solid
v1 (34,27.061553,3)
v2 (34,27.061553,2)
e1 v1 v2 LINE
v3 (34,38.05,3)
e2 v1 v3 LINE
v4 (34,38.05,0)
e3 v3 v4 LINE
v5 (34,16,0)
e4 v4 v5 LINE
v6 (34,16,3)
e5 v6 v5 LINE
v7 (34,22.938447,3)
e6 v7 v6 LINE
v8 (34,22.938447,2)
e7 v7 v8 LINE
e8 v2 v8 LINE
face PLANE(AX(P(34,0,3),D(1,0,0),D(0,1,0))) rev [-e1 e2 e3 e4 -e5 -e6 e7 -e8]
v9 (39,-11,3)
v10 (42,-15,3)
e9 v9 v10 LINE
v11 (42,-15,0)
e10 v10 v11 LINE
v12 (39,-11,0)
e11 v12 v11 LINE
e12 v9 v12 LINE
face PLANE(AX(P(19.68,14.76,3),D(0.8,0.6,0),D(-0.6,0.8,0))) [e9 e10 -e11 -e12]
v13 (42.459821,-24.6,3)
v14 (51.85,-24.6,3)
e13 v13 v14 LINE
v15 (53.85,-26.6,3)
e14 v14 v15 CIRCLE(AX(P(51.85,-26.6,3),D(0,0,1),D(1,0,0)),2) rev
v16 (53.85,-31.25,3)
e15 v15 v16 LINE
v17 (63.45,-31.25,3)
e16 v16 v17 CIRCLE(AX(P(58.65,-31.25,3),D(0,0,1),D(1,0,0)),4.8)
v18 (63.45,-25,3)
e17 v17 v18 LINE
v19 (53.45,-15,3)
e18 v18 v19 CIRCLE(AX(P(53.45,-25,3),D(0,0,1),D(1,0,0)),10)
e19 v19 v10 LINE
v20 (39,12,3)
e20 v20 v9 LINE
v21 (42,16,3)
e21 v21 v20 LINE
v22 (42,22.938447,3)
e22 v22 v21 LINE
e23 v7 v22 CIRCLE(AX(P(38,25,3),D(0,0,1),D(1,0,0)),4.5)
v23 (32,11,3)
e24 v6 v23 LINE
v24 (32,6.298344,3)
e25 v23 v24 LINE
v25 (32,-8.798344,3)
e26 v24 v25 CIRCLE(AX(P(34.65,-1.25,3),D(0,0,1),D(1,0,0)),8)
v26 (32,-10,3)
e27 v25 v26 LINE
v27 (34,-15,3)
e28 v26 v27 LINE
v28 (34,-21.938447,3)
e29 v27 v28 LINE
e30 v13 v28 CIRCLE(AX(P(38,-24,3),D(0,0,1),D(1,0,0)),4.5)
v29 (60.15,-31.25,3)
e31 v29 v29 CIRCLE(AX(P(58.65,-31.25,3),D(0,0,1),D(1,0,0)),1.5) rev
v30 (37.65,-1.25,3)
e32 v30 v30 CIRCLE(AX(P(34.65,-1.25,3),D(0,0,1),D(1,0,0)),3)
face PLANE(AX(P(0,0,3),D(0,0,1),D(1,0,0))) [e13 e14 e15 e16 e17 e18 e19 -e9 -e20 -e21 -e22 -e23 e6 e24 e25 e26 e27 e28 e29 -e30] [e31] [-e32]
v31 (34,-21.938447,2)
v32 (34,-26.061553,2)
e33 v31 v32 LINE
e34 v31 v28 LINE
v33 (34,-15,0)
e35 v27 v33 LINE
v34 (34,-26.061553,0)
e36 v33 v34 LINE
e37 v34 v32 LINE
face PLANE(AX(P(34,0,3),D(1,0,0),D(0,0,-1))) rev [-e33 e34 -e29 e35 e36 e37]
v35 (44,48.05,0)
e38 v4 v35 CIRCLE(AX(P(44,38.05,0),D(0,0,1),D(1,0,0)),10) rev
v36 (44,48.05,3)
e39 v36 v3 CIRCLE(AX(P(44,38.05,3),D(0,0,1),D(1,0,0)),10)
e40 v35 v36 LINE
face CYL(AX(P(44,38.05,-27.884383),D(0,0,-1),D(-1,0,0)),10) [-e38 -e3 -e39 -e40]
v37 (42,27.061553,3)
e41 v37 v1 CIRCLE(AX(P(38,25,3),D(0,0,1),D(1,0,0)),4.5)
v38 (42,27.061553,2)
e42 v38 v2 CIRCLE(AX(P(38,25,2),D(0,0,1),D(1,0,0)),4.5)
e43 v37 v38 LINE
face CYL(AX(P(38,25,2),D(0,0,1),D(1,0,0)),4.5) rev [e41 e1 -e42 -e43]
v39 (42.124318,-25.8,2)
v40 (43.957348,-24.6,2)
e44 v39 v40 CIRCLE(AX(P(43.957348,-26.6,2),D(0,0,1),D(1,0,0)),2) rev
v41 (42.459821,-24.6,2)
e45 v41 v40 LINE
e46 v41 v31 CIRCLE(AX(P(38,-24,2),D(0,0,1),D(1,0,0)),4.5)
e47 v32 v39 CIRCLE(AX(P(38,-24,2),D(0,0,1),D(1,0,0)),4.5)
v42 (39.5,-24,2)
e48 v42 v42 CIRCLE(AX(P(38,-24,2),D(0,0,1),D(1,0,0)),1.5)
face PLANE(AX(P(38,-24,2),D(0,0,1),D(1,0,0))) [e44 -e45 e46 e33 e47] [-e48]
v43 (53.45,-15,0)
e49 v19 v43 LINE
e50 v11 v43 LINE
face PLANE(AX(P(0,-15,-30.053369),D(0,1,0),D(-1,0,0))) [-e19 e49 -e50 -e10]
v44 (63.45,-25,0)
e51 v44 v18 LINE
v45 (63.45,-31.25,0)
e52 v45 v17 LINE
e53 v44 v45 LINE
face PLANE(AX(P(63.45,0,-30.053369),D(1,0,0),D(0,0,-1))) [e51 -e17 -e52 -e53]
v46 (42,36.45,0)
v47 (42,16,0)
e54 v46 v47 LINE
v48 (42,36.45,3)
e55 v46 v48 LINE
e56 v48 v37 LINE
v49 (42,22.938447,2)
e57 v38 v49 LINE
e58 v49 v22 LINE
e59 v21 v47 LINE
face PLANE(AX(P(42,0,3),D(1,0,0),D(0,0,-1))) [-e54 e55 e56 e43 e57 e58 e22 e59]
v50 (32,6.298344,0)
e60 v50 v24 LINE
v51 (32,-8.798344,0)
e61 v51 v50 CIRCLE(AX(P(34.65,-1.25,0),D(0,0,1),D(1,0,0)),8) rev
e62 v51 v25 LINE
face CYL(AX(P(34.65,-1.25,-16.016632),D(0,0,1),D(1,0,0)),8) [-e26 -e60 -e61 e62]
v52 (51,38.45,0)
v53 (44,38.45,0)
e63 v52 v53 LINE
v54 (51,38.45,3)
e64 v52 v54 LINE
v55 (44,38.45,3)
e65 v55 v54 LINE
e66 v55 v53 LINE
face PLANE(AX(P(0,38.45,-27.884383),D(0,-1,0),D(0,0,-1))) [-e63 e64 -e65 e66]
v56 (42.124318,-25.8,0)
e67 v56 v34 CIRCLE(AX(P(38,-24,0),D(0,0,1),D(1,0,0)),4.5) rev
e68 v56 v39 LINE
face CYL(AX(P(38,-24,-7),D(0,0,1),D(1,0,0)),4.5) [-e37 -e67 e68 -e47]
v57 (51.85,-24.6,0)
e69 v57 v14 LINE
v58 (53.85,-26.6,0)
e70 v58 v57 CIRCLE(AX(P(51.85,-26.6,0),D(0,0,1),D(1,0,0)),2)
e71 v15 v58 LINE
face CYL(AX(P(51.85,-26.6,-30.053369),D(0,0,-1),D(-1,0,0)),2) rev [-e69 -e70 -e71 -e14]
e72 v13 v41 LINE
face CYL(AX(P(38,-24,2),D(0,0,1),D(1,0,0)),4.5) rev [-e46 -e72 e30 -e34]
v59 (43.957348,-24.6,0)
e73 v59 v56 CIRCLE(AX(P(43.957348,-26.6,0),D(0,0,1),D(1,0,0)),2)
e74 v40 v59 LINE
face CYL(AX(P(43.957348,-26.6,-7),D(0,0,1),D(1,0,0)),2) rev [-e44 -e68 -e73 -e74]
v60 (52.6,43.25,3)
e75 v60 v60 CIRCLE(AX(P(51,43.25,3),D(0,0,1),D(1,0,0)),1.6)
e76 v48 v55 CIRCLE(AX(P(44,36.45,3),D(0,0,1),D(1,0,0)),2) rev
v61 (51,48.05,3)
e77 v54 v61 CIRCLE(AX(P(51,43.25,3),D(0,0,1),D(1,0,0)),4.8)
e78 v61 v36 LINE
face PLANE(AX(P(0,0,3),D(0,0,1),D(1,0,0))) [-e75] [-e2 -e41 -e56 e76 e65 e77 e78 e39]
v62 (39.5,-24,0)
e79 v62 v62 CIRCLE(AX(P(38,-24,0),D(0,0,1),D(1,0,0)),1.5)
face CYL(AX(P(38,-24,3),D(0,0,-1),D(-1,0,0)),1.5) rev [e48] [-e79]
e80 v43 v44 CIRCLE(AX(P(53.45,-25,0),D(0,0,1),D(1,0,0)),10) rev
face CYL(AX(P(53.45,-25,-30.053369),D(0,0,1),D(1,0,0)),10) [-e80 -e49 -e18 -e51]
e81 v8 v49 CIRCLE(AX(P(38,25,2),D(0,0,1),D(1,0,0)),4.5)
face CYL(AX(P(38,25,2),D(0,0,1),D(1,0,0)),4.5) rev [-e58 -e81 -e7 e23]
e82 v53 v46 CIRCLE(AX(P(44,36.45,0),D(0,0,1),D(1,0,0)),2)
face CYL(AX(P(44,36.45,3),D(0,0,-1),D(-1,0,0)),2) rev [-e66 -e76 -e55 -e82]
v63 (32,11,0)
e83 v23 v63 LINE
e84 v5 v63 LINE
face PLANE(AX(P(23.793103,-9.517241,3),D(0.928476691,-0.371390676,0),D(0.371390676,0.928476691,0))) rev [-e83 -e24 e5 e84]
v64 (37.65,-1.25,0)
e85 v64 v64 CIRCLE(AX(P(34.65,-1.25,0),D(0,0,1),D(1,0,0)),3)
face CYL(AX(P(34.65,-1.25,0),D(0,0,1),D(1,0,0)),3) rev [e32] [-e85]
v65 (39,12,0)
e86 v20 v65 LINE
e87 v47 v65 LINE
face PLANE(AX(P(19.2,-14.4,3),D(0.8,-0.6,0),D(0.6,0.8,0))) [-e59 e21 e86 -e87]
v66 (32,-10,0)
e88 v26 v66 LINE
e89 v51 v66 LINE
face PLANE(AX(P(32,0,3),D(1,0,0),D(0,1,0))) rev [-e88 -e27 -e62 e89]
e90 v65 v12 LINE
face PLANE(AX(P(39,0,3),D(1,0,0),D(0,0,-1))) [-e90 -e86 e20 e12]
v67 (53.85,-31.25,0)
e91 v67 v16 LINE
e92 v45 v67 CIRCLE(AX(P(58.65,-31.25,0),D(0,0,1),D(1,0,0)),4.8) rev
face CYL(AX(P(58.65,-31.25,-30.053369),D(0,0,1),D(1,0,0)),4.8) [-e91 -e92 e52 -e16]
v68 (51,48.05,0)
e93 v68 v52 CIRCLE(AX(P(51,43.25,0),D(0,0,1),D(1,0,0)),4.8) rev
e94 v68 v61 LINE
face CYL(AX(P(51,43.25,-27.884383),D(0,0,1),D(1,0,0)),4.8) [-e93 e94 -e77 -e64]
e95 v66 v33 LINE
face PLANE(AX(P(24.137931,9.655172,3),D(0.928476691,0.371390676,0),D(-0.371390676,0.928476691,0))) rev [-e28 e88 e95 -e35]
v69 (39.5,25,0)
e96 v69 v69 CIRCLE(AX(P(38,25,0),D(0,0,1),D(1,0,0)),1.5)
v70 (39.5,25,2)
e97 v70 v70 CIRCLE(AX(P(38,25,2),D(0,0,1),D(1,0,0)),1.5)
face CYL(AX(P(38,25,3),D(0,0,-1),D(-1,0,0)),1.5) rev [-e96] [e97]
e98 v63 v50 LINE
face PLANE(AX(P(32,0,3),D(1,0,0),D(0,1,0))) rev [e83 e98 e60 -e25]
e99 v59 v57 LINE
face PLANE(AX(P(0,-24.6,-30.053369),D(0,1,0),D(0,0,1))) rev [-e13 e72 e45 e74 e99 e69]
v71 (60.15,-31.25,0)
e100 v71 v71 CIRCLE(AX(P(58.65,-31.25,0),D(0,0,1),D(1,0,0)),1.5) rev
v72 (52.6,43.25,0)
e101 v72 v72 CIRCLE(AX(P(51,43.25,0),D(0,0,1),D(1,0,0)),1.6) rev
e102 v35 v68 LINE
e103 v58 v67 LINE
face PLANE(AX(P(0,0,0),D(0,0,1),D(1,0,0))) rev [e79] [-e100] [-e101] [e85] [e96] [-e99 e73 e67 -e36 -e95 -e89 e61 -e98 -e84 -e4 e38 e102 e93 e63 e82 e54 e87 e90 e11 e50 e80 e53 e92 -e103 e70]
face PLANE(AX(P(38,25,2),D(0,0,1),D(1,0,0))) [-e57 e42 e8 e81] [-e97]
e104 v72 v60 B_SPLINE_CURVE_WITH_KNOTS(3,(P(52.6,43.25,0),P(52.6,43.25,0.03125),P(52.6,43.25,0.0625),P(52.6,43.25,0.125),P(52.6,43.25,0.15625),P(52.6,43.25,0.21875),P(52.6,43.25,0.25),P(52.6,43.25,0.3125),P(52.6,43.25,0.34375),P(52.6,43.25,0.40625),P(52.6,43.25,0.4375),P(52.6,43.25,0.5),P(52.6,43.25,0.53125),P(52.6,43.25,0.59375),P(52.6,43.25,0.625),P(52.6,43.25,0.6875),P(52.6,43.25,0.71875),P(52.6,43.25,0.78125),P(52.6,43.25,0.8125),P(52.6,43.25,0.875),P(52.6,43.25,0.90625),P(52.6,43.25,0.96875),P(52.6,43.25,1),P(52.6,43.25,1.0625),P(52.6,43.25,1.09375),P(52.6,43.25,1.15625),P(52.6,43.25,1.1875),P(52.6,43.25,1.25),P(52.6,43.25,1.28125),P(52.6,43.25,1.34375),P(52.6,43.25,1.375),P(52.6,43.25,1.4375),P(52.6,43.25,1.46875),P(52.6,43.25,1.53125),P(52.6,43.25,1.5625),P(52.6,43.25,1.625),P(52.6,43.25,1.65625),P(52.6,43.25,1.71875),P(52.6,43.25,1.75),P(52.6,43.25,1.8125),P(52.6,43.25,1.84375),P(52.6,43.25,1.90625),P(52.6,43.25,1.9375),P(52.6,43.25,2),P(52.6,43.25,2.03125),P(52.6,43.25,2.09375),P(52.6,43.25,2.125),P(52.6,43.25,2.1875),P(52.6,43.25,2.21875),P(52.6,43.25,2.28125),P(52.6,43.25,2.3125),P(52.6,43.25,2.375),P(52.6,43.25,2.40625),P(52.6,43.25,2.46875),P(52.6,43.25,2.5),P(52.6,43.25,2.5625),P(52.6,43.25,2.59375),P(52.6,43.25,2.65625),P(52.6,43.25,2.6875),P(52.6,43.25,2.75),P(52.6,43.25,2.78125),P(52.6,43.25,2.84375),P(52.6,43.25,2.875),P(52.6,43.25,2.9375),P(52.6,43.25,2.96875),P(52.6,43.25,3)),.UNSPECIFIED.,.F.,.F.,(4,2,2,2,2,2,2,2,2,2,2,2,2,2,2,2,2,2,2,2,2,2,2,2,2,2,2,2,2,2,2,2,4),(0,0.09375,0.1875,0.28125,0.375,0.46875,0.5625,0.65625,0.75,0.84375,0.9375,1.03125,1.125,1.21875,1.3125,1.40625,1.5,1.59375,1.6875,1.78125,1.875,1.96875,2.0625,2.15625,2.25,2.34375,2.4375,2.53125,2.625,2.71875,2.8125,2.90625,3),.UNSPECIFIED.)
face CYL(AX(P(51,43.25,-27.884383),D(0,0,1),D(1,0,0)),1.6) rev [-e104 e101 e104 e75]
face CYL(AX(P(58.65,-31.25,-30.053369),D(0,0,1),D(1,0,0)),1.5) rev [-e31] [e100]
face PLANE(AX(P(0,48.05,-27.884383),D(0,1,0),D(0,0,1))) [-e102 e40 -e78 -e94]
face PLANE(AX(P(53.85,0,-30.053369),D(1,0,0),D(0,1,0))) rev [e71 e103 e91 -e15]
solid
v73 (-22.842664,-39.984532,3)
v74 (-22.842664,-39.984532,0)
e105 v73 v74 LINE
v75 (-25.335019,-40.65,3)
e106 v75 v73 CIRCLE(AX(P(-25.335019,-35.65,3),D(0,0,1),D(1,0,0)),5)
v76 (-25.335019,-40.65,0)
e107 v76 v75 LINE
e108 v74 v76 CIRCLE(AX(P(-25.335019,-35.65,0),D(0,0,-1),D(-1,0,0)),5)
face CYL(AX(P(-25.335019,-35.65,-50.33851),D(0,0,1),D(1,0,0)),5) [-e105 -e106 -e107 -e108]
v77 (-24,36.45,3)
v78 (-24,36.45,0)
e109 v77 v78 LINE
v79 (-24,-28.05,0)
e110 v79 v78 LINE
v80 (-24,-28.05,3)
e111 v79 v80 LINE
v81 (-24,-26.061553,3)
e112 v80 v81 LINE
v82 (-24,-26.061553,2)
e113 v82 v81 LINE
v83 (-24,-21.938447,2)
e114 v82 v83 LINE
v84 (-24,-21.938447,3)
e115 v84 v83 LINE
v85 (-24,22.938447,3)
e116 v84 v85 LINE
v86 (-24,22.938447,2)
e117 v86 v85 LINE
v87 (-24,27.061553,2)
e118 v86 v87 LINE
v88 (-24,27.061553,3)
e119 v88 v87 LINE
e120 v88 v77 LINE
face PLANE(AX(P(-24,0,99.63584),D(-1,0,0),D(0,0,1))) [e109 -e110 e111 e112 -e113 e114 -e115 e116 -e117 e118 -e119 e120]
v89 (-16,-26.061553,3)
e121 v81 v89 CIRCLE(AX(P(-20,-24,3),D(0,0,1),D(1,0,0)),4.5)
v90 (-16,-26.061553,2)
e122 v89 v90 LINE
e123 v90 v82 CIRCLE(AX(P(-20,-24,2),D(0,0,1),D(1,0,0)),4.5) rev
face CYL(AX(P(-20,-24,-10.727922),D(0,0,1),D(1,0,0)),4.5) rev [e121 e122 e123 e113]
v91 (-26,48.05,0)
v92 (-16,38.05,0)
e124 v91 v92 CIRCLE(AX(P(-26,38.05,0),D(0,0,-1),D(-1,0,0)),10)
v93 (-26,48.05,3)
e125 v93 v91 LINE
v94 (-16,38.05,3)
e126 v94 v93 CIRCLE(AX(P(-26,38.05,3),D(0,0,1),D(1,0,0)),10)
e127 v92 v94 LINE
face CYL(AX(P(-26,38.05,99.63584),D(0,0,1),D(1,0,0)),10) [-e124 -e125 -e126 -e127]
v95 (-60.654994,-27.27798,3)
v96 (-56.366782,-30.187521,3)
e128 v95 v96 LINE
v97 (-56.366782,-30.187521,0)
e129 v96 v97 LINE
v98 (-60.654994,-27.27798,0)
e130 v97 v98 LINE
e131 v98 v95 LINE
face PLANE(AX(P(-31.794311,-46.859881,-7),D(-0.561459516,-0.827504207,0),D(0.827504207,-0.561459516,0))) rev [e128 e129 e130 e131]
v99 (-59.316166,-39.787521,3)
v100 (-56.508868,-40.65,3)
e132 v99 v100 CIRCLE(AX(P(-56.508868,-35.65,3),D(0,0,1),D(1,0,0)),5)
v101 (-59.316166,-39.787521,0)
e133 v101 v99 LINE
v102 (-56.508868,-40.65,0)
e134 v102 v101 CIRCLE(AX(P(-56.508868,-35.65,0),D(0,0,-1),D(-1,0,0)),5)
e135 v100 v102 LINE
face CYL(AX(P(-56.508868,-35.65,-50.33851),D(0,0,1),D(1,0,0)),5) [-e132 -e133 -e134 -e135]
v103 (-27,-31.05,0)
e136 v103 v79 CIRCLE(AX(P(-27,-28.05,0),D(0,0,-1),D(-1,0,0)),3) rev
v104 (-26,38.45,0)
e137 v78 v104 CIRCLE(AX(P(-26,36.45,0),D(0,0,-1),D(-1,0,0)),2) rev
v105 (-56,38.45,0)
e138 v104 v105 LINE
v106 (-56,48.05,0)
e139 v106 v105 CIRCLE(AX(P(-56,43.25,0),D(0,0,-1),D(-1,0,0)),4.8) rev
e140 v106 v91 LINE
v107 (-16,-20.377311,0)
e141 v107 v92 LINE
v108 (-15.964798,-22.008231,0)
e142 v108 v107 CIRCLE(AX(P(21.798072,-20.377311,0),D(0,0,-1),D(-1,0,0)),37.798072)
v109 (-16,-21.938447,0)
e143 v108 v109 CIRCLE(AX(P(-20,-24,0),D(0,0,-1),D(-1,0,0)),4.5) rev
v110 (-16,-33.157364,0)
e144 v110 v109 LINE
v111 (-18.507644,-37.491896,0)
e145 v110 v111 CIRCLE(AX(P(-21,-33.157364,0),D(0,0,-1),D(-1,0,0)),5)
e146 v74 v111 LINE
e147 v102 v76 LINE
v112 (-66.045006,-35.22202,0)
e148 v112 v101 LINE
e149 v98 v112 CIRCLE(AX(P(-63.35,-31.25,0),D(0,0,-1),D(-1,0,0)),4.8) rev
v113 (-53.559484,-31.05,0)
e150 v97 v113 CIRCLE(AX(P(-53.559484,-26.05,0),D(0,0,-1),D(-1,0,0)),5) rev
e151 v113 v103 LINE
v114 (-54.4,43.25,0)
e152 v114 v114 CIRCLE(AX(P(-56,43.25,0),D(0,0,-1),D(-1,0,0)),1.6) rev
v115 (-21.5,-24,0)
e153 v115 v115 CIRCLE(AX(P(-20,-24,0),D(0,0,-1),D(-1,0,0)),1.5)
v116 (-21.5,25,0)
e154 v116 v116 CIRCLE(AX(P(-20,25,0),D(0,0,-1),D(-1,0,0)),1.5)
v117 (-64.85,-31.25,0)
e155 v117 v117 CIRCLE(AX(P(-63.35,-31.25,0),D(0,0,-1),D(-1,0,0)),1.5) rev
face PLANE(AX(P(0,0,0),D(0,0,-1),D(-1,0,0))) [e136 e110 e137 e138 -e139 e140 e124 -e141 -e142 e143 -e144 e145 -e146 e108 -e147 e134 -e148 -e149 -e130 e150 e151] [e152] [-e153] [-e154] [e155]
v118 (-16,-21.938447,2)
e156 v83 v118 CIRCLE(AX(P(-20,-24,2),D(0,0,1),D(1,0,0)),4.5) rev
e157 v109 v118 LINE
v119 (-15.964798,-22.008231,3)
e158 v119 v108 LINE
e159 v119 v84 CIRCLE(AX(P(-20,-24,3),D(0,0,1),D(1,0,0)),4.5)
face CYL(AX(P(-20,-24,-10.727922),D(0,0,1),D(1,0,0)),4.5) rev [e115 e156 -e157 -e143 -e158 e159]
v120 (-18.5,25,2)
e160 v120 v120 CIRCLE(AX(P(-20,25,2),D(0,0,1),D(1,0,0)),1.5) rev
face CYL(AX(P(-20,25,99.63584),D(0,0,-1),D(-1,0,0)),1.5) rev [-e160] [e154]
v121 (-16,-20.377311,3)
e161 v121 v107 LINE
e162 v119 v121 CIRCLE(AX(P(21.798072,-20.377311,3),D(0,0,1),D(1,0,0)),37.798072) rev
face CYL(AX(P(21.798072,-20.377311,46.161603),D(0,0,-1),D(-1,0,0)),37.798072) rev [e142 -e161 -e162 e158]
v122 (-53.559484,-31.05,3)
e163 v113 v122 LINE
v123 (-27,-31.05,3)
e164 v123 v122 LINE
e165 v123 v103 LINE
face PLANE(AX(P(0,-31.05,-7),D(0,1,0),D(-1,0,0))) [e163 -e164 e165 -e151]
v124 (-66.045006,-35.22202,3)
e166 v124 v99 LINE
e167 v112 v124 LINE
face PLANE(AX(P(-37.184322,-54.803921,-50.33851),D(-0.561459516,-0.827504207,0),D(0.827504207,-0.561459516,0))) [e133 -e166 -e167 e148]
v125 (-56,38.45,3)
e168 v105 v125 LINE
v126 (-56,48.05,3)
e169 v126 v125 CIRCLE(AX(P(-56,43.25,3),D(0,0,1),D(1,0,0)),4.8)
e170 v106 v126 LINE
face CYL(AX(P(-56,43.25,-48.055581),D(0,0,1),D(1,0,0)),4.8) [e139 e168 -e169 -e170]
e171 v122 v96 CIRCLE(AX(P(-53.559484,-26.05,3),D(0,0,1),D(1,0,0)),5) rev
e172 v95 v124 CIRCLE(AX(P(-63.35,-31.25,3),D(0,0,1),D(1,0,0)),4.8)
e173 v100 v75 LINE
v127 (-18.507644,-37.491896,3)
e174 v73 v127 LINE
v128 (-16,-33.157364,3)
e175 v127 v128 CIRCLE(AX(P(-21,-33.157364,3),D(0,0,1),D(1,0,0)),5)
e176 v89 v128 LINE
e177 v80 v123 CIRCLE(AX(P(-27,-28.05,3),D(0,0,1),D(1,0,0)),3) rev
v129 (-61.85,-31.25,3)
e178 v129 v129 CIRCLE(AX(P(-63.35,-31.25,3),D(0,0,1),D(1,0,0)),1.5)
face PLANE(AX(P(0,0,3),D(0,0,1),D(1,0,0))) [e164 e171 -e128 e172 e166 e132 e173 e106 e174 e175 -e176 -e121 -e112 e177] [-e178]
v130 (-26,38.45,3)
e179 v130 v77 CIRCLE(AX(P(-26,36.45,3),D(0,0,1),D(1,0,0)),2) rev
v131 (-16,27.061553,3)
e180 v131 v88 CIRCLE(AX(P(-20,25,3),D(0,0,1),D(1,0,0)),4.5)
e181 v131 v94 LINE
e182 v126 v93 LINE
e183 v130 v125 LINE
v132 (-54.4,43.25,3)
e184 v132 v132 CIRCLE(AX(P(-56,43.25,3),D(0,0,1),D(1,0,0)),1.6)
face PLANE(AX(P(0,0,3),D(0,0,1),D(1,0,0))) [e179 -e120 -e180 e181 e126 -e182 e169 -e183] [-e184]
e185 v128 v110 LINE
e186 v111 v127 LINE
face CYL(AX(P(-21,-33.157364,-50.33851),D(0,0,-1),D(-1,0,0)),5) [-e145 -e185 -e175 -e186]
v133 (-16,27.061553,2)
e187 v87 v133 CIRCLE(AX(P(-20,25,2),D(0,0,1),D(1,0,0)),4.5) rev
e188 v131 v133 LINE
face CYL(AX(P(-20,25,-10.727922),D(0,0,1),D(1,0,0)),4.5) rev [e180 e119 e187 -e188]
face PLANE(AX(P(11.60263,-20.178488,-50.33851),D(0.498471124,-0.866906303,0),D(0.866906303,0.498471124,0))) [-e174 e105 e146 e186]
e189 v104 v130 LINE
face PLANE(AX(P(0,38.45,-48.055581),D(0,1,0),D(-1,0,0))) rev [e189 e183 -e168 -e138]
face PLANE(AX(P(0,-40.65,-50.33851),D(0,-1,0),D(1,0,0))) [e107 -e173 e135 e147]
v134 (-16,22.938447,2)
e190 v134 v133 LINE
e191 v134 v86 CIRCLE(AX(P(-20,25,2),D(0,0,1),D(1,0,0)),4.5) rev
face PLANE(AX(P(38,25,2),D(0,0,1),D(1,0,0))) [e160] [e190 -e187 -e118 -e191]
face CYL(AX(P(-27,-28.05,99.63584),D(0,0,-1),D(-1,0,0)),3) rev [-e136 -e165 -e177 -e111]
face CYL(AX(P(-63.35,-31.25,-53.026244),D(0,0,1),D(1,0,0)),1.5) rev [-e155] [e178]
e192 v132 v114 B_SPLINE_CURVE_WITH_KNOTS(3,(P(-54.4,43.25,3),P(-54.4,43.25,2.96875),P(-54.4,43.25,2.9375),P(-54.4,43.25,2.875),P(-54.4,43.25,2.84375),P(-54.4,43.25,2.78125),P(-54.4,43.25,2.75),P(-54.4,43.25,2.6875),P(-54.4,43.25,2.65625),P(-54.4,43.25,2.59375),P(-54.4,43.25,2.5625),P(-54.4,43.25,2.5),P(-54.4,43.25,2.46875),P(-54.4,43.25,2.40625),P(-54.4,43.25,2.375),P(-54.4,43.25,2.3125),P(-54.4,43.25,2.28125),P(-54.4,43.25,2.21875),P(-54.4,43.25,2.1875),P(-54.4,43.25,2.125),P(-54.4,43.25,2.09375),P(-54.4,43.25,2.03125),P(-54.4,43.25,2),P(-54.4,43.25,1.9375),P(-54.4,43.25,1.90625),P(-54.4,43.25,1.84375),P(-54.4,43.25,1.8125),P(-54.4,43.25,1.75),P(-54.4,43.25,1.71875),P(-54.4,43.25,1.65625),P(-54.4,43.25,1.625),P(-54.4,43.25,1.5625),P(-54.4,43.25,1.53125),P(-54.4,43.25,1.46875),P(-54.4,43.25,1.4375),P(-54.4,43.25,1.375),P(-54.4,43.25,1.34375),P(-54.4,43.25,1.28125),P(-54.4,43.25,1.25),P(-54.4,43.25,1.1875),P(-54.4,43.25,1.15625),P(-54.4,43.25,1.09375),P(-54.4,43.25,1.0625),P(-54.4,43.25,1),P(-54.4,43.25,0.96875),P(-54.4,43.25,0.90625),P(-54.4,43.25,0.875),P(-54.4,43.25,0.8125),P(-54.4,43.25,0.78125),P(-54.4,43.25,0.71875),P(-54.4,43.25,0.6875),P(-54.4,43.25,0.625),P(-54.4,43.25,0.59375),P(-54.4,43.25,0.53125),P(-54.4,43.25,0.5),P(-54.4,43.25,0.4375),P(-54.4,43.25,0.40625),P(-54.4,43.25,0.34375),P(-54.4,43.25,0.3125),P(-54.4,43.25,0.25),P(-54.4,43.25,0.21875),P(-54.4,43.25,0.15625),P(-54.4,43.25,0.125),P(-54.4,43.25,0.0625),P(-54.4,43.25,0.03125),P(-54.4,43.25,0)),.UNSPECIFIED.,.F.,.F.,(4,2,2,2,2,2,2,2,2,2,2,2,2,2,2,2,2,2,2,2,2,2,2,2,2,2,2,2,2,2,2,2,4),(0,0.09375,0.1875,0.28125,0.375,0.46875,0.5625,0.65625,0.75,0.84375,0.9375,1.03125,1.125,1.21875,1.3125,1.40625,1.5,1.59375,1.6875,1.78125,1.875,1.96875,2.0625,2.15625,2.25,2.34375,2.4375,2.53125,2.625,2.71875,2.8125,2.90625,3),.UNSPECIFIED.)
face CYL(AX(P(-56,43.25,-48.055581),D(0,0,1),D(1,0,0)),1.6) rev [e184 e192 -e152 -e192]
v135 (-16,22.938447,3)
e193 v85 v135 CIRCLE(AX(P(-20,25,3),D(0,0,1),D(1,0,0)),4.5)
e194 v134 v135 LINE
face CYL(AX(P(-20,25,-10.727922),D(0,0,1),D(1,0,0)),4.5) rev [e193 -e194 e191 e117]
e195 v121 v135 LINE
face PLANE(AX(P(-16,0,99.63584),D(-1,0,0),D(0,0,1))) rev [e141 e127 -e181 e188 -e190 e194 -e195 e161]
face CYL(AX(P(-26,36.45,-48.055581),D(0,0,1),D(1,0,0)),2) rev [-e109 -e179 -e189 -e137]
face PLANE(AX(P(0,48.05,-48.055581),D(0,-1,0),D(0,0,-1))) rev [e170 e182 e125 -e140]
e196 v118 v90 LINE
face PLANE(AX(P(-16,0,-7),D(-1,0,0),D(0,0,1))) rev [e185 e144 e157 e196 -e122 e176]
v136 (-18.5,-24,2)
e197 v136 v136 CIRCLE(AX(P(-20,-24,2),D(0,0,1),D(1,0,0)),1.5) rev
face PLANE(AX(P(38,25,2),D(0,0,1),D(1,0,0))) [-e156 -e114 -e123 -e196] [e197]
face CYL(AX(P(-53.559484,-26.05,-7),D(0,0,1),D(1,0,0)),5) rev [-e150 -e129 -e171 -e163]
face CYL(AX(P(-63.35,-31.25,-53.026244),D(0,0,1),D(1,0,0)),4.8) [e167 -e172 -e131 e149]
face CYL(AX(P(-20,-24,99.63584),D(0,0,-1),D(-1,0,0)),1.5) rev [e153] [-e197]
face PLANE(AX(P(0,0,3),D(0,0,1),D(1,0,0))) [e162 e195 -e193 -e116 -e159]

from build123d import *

# Parameters (mm, degrees)
SKETCH1_R            = 4
SKETCH1_R_2          = 1.5
BOSS_EXTRUDE1_DEPTH  = 3
SKETCH3_R            = 4
SKETCH3_R_2          = 1.5
BOSS_EXTRUDE2_DEPTH  = 3
BOSS_EXTRUDE3_START  = -3
SKETCH4_R            = 4.5
SKETCH4_R_2          = 1.5
BOSS_EXTRUDE3_DEPTH  = 3
BOSS_EXTRUDE4_START  = -3
SKETCH6_R            = 4.5
SKETCH6_R_2          = 1.5
BOSS_EXTRUDE4_DEPTH  = 3
SKETCH7_R            = 4.5
CUT_EXTRUDE1_DEPTH   = 1
BOSS_EXTRUDE5_START  = -2
SKETCH8_R            = 4.5
BOSS_EXTRUDE5_DEPTH  = 2
CUT_EXTRUDE2_DEPTH   = 1
SKETCH11_R           = 4.5
SKETCH11_R_2         = 1.5
BOSS_EXTRUDE6_DEPTH  = 3
CUT_EXTRUDE3_DEPTH   = 10
FILLET1_R            = 15
SKETCH13_R           = 4.5
CUT_EXTRUDE4_DEPTH   = 1
SKETCH14_R           = 2.8
CUT_EXTRUDE5_DEPTH   = 1
CUT_EXTRUDE6_DEPTH   = 10
SKETCH17_R           = 4.8
SKETCH17_R_2         = 2.8
SKETCH17_R_3         = 1.5
BOSS_EXTRUDE7_DEPTH  = 2
CUT_EXTRUDE7_DEPTH   = 10
BOSS_EXTRUDE9_DEPTH  = 2
BOSS_EXTRUDE10_START = 1
SKETCH20_R           = 1.5
BOSS_EXTRUDE10_DEPTH = 1
FILLET2_R            = 2
FILLET3_R            = 10
BOSS_EXTRUDE11_DEPTH = 3
CUT_EXTRUDE8_DEPTH   = 74.037695747
BOSS_EXTRUDE13_DEPTH = 3
CUT_EXTRUDE9_START   = 27
SKETCH23_R           = 4.5
CUT_EXTRUDE9_DEPTH   = 27
SKETCH24_R           = 1.6
BOSS_EXTRUDE14_DEPTH = 3
CUT_EXTRUDE10_DEPTH  = 80.647379116
FILLET4_R            = 2
FILLET5_R            = 10
SKETCH26_R           = 1.6
BOSS_EXTRUDE15_DEPTH = 3
FILLET6_R            = 2
FILLET7_R            = 10
BOSS_EXTRUDE16_DEPTH = 3
SKETCH28_R           = 4.8
SKETCH28_R_2         = 1.5
BOSS_EXTRUDE17_DEPTH = 3
CUT_EXTRUDE11_DEPTH  = 10
BOSS_EXTRUDE18_DEPTH = 3
FILLET10_R           = 3
FILLET11_R           = 5


with BuildPart() as part:
    # Sketch1 → Boss-Extrude1 (new body)
    # profile 1 of 3: a face of its own
    with BuildSketch(Plane.XY):
        with BuildLine():
            Line((42, 16), (42, 25))
            ThreePointArc((42, 25), (38, 21), (34, 25))
            Line((34, 25), (34, 16))
            Line((34, 16), (32, 11))
            Line((32, 11), (32, -10))
            Line((32, -10), (34, -15))
            Line((34, -15), (34, -24))
            ThreePointArc((34, -24), (38, -20), (42, -24))
            Line((42, -24), (42, -15))
            Line((42, -15), (39, -11))
            Line((39, -11), (39, 12))
            Line((39, 12), (42, 16))
        make_face()
    # profile 2 of 3: a face of its own
    with BuildSketch(Plane.XY):
        with Locations((38, 25)):
            Circle(SKETCH1_R)
        with Locations((38, 25)):
            Circle(SKETCH1_R_2, mode=Mode.SUBTRACT)
    # profile 3 of 3: a face of its own
    with BuildSketch(Plane.XY):
        with Locations((38, -24)):
            Circle(SKETCH1_R)
        with Locations((38, -24)):
            Circle(SKETCH1_R_2, mode=Mode.SUBTRACT)
    extrude(amount=BOSS_EXTRUDE1_DEPTH)

    # Sketch4 → Boss-Extrude3 (add)
    # profile 1 of 2: a face of its own
    with BuildSketch(Plane.XY.offset(3).offset(BOSS_EXTRUDE3_START)):
        with BuildLine():
            Line((41.611961927, 26.718642207), (38.389507789, 40.991070821))
            ThreePointArc((38.389507789, 40.991070821), (38.472291641, 40.498605531), (38.5, 40))
            ThreePointArc((38.5, 40), (34.682909647, 35.552120234), (29.707273594, 38.65))
            Line((29.707273594, 38.65), (34, 25))
            ThreePointArc((34, 25), (37.119048159, 28.901784701), (41.611961927, 26.718642207))
        make_face()
    # profile 2 of 2: a face of its own
    with BuildSketch(Plane.XY.offset(3).offset(BOSS_EXTRUDE3_START)):
        with Locations((34, 40)):
            Circle(SKETCH4_R)
        with Locations((34, 40)):
            Circle(SKETCH4_R_2, mode=Mode.SUBTRACT)
    extrude(amount=BOSS_EXTRUDE3_DEPTH)

    # Sketch6 → Boss-Extrude4 (add)
    # profile 1 of 2: a face of its own
    with BuildSketch(Plane.XY.offset(3).offset(BOSS_EXTRUDE4_START)):
        with BuildLine():
            ThreePointArc((41.871336735, -25.006355743), (37.492726377, -27.967703803), (34, -24))
            Line((34, -24), (29.058763693, -54.27514135))
            ThreePointArc((29.058763693, -54.27514135), (33.863618356, -50.514714982), (38, -55))
            ThreePointArc((38, -55), (37.990907509, -55.285919128), (37.963666779, -55.570682826))
            Line((37.963666779, -55.570682826), (41.871336735, -25.006355743))
        make_face()
    # profile 2 of 2: a face of its own
    with BuildSketch(Plane.XY.offset(3).offset(BOSS_EXTRUDE4_START)):
        with Locations((33.5, -55)):
            Circle(SKETCH6_R)
        with Locations((33.5, -55)):
            Circle(SKETCH6_R_2, mode=Mode.SUBTRACT)
    extrude(amount=BOSS_EXTRUDE4_DEPTH)

    # Sketch7 → Cut-Extrude1 (cut)
    with BuildSketch(Plane.XY.offset(3)):
        with Locations((38, -24)):
            Circle(SKETCH7_R)
        with Locations((38, 25)):
            Circle(SKETCH7_R)
    extrude(amount=-CUT_EXTRUDE1_DEPTH, mode=Mode.SUBTRACT)

    # Sketch8 → Boss-Extrude5 (add)
    # profile 1 of 2: a face of its own
    with BuildSketch(Plane.XY.offset(BOSS_EXTRUDE5_START)):
        with Locations((33.5, -55)):
            Circle(SKETCH8_R)
        Polygon((34.020796686, -51.80905905), (30.996962418, -52.953506365), (30.476165733, -56.144447315), (32.979203314, -58.19094095), (36.003037582, -57.046493635), (36.523834267, -53.855552685), align=None, mode=Mode.SUBTRACT)
    # profile 2 of 2: a face of its own
    with BuildSketch(Plane.XY.offset(BOSS_EXTRUDE5_START)):
        with Locations((34, 40)):
            Circle(SKETCH8_R)
        Polygon((34.712064895, 36.846224973), (37.087281738, 39.039778775), (36.375216843, 42.193553802), (33.287935105, 43.153775027), (30.912718262, 40.960221225), (31.624783157, 37.806446198), align=None, mode=Mode.SUBTRACT)
    extrude(amount=BOSS_EXTRUDE5_DEPTH)

    # Sketch9 → Cut-Extrude2 (cut)
    with BuildSketch(Plane.XY):
        Polygon((31.624783157, 37.806446198), (34.712064895, 36.846224973), (37.087281738, 39.039778775), (36.375216843, 42.193553802), (33.287935105, 43.153775027), (30.912718262, 40.960221225), align=None)
        Polygon((36.523834267, -53.855552685), (34.020796686, -51.80905905), (30.996962418, -52.953506365), (30.476165733, -56.144447315), (32.979203314, -58.19094095), (36.003037582, -57.046493635), align=None)
    extrude(amount=CUT_EXTRUDE2_DEPTH, mode=Mode.SUBTRACT)


with BuildPart() as body_2:
    # Sketch3 → Boss-Extrude2 (new body)
    # profile 1 of 5: a face of its own
    with BuildSketch(Plane(origin=(0, 0, 0), x_dir=(-1, 0, 0), z_dir=(0, 0, -1))):
        with BuildLine():
            Line((16, 48.652065436), (16, 25.000000006))
            ThreePointArc((16, 25.000000006), (20.000000003, 29), (24, 25))
            Line((24, 25), (24, 48.652065436))
            Line((24, 48.652065436), (16, 48.652065436))
        make_face()
    # profile 2 of 5: a face of its own
    with BuildSketch(Plane(origin=(0, 0, 0), x_dir=(-1, 0, 0), z_dir=(0, 0, -1))):
        with BuildLine():
            Line((16, 25.000000006), (16, -24))
            ThreePointArc((16, -24), (20, -20), (24, -24))
            Line((24, -24), (24, 25))
            ThreePointArc((24, 25), (19.999999997, 21), (16, 25.000000006))
        make_face()
    # profile 3 of 5: a face of its own
    with BuildSketch(Plane(origin=(0, 0, 0), x_dir=(-1, 0, 0), z_dir=(0, 0, -1))):
        with Locations((20, 25)):
            Circle(SKETCH3_R)
        with Locations((20, 25)):
            Circle(SKETCH3_R_2, mode=Mode.SUBTRACT)
    # profile 4 of 5: a face of its own
    with BuildSketch(Plane(origin=(0, 0, 0), x_dir=(-1, 0, 0), z_dir=(0, 0, -1))):
        with Locations((20, -24)):
            Circle(SKETCH3_R)
        with Locations((20, -24)):
            Circle(SKETCH3_R_2, mode=Mode.SUBTRACT)
    # profile 5 of 5: a face of its own
    with BuildSketch(Plane(origin=(0, 0, 0), x_dir=(-1, 0, 0), z_dir=(0, 0, -1))):
        with BuildLine():
            Line((16, -24), (16, -47.652065436))
            Line((16, -47.652065436), (24, -47.652065436))
            Line((24, -47.652065436), (24, -24))
            ThreePointArc((24, -24), (20, -28), (16, -24))
        make_face()
    extrude(amount=-BOSS_EXTRUDE2_DEPTH)

    # Sketch11 → Boss-Extrude6 (add)
    # profile 1 of 4: a face of its own
    with BuildSketch(Plane(origin=(0, 0, 0), x_dir=(-1, 0, 0), z_dir=(0, 0, -1))):
        with BuildLine():
            Line((16, 27.514718626), (16, 44.462274403))
            ThreePointArc((16, 44.462274403), (13.830389495, 45.741768871), (11.519982105, 46.744930638))
            ThreePointArc((11.519982105, 46.744930638), (13.670125556, 45.097725276), (14.485281374, 42.514718626))
            ThreePointArc((14.485281374, 42.514718626), (12.568288024, 38.829874444), (8.450580643, 38.284506614))
            ThreePointArc((8.450580643, 38.284506614), (13.924677223, 34.09085096), (16, 27.514718626))
        make_face()
    # profile 2 of 4: a face of its own
    with BuildSketch(Plane(origin=(0, 0, 0), x_dir=(-1, 0, 0), z_dir=(0, 0, -1))):
        with Locations((9.985281374, 42.514718626)):
            Circle(SKETCH11_R)
        with Locations((9.985281374, 42.514718626)):
            Circle(SKETCH11_R_2, mode=Mode.SUBTRACT)
    # profile 3 of 4: a face of its own
    with BuildSketch(Plane(origin=(0, 0, 0), x_dir=(-1, 0, 0), z_dir=(0, 0, -1))):
        with BuildLine():
            ThreePointArc((5.085019105, -58.683432669), (11.122941196, -53.637894787), (16.230171628, -47.652065436))
            Line((16.230171628, -47.652065436), (16, -47.652065436))
            Line((16, -47.652065436), (16, -20.377310968))
            ThreePointArc((16, -20.377310968), (11.738518343, -37.812658856), (-0.085019105, -51.316567331))
            ThreePointArc((-0.085019105, -51.316567331), (4.575742521, -51.007345121), (7, -55))
            ThreePointArc((7, -55), (6.492654879, -57.075742521), (5.085019105, -58.683432669))
        make_face()
    # profile 4 of 4: a face of its own
    with BuildSketch(Plane(origin=(0, 0, 0), x_dir=(-1, 0, 0), z_dir=(0, 0, -1))):
        with Locations((2.5, -55)):
            Circle(SKETCH11_R)
        with Locations((2.5, -55)):
            Circle(SKETCH11_R_2, mode=Mode.SUBTRACT)
    extrude(amount=-BOSS_EXTRUDE6_DEPTH)

    # Sketch11<3> → Cut-Extrude3 (cut)
    with BuildSketch(Plane(origin=(0, 0, 0), x_dir=(-1, 0, 0), z_dir=(0, 0, -1))):
        with BuildLine():
            Line((16.230171628, -47.652065436), (24, -47.652065436))
            Line((24, -47.652065436), (24, -30))
            ThreePointArc((24, -30), (21.034294866, -39.230636734), (16.230171628, -47.652065436))
        make_face()
        with BuildLine():
            ThreePointArc((16, 44.462274403), (20.888273047, 39.815856602), (24, 33.832415523))
            Line((24, 33.832415523), (24, 48.652065436))
            Line((24, 48.652065436), (16, 48.652065436))
            Line((16, 48.652065436), (16, 44.462274403))
        make_face()
    extrude(amount=-CUT_EXTRUDE3_DEPTH, mode=Mode.SUBTRACT)

    # Fillet1
    fillet1_edges = [body_2.edges().sort_by_distance(p)[0] for p in [
        (-24, -30, 1.5),
        (-24, 33.832415523, 1.5),
    ]]
    fillet(fillet1_edges, radius=FILLET1_R)

    # Sketch13 → Cut-Extrude4 (cut)
    with BuildSketch(Plane.XY.offset(3)):
        with Locations((-20, 25)):
            Circle(SKETCH13_R)
        with Locations((-20, -24)):
            Circle(SKETCH13_R)
    extrude(amount=-CUT_EXTRUDE4_DEPTH, mode=Mode.SUBTRACT)

    # Sketch14 → Cut-Extrude5 (cut)
    with BuildSketch(Plane.XY):
        with Locations((-9.985281374, 42.514718626)):
            Circle(SKETCH14_R)
        with Locations((-2.5, -55)):
            Circle(SKETCH14_R)
    extrude(amount=CUT_EXTRUDE5_DEPTH, mode=Mode.SUBTRACT)


with BuildPart() as cut_extrude6_tool:
    # Sketch16 → Cut-Extrude6 (new body)
    with BuildSketch(Plane.XY.offset(3)):
        Polygon((-16, 30.663257031), (-24, 30.663257031), (-24, 50.56831031), (-1.716420621, 50.56831031), (-1.716420621, 28.39303204), (-16, 27.061552813), align=None)
        Polygon((42, 30.663257031), (34, 30.663257031), (25.237418799, 30.663257031), (25.237418799, 48.578351607), (45.435435347, 48.578351607), (45.435435347, 22.938447187), (42, 22.938447187), align=None)
        Polygon((25.237418799, 30.663257031), (25.237418799, 22.938447187), (34, 25), (34, 30.663257031), align=None)
        Polygon((23.407781263, -41.193839321), (34, -21.938447187), (34, -29.242024032), (42.469363363, -29.242024032), (42.469363363, -67.614426645), (23.407781263, -67.614426645), align=None)
        with BuildLine():
            Line((-16, -32.135615049), (-24, -32.135615049))
            Line((-24, -32.135615049), (-24, -67.614426645))
            Line((-24, -67.614426645), (10.617937566, -67.614426645))
            Line((10.617937566, -67.614426645), (10.617937566, -31.417618327))
            Line((10.617937566, -31.417618327), (-16, -20.377310968))
            ThreePointArc((-16, -20.377310968), (-15.991198464, -21.192960823), (-15.964797957, -22.008230819))
            ThreePointArc((-15.964797957, -22.008230819), (-15.982247468, -21.973262575), (-16, -21.938447187))
            Line((-16, -21.938447187), (-16, -32.135615049))
        make_face()
    extrude(amount=-CUT_EXTRUDE6_DEPTH)


with BuildPart() as part_1:
    add(part.part)

    # Cut-Extrude6: cut by cut_extrude6_tool
    add(cut_extrude6_tool.part, mode=Mode.SUBTRACT)

    # Sketch17 → Boss-Extrude7 (add)
    # profile 1 of 3: a face of its own
    with BuildSketch(Plane.XY.offset(2)):
        with BuildLine():
            ThreePointArc((53.85, -31.25), (58.65, -26.45), (63.45, -31.25))
            Line((63.45, -31.25), (63.45, -15))
            Line((63.45, -15), (42, -15))
            Line((42, -15), (42, -21.938447187))
            Line((42, -21.938447187), (42, -24))
            Line((42, -24), (42, -24.6))
            Line((42, -24.6), (53.85, -24.6))
            Line((53.85, -24.6), (53.85, -31.25))
        make_face()
    # profile 2 of 3: a face of its own
    with BuildSketch(Plane.XY.offset(2)):
        with Locations((58.65, -31.25)):
            Circle(SKETCH17_R)
        with Locations((58.65, -31.25)):
            Circle(SKETCH17_R_2, mode=Mode.SUBTRACT)
    # profile 3 of 3: a face of its own
    with BuildSketch(Plane.XY.offset(2)):
        with Locations((58.65, -31.25)):
            Circle(SKETCH17_R_2)
        with Locations((58.65, -31.25)):
            Circle(SKETCH17_R_3, mode=Mode.SUBTRACT)
    extrude(amount=-BOSS_EXTRUDE7_DEPTH)

    # Sketch18 → Cut-Extrude7 (cut)
    with BuildSketch(Plane.XY.offset(3)):
        with BuildLine():
            Line((41.329803671, -29.242024032), (41.666426992, -26.60908281))
            ThreePointArc((41.666426992, -26.60908281), (37.679430176, -28.488567142), (34, -26.061552813))
            Line((34, -26.061552813), (34, -29.242024032))
            Line((34, -29.242024032), (41.329803671, -29.242024032))
        make_face()
        with BuildLine():
            Line((34, -29.242024032), (34, -26.061552813))
            Line((34, -26.061552813), (32.029569101, -30.819040511))
            Line((32.029569101, -30.819040511), (38, -35.971767702))
            Line((38, -35.971767702), (45.770174944, -27.740787904))
            Line((45.770174944, -27.740787904), (42.459820624, -24.6))
            ThreePointArc((42.459820624, -24.6), (42.185460371, -25.652852529), (41.666426992, -26.60908281))
            Line((41.666426992, -26.60908281), (41.329803671, -29.242024032))
            Line((41.329803671, -29.242024032), (34, -29.242024032))
        make_face()
    extrude(amount=-CUT_EXTRUDE7_DEPTH, mode=Mode.SUBTRACT)

    # Sketch19 → Boss-Extrude9 (add)
    with BuildSketch(Plane.XY.offset(2)):
        with BuildLine():
            ThreePointArc((42, -21.938447187), (41.923417629, -21.796186463), (41.841777833, -21.656766533))
            Line((41.841777833, -21.656766533), (40.412386546, -27.798735468))
            ThreePointArc((40.412386546, -27.798735468), (41.097065041, -27.26468806), (41.666426992, -26.60908281))
            Line((41.666426992, -26.60908281), (41.871336735, -25.006355743))
            ThreePointArc((41.871336735, -25.006355743), (41.967703803, -24.507273623), (42, -24))
            Line((42, -24), (42, -24.6))
            Line((42, -24.6), (42.459820624, -24.6))
            ThreePointArc((42.459820624, -24.6), (42.434310216, -23.23391064), (42, -21.938447187))
        make_face()
        with BuildLine():
            Line((41.871336735, -25.006355743), (41.666426992, -26.60908281))
            ThreePointArc((41.666426992, -26.60908281), (42.185460371, -25.652852529), (42.459820624, -24.6))
            Line((42.459820624, -24.6), (42, -24.6))
            Line((42, -24.6), (42, -24))
            ThreePointArc((42, -24), (41.967703803, -24.507273623), (41.871336735, -25.006355743))
        make_face()
    extrude(amount=-BOSS_EXTRUDE9_DEPTH)

    # Sketch20 → Boss-Extrude10 (add)
    with BuildSketch(Plane.XY.offset(2).offset(BOSS_EXTRUDE10_START)):
        with BuildLine():
            ThreePointArc((53.85, -31.25), (58.65, -36.05), (63.45, -31.25))
            Line((63.45, -31.25), (63.45, -15))
            Line((63.45, -15), (42, -15))
            Line((42, -15), (42, -21.938447187))
            ThreePointArc((42, -21.938447187), (42.373213921, -22.939339828), (42.5, -24))
            ThreePointArc((42.5, -24), (42.48994392, -24.300671907), (42.459820624, -24.6))
            Line((42.459820624, -24.6), (53.85, -24.6))
            Line((53.85, -24.6), (53.85, -31.25))
        make_face()
        with Locations((58.65, -31.25)):
            Circle(SKETCH20_R, mode=Mode.SUBTRACT)
    extrude(amount=-BOSS_EXTRUDE10_DEPTH)

    # Fillet2
    # the kernel refuses this fillet: 2 mm, written as the material it adds along each edge
    with BuildSketch(Plane(origin=(53.85, -24.6, 2), x_dir=(0, -1, 0), z_dir=(0, 0, -1))) as fillet2_piece_1:
        with BuildLine():
            CenterArc((FILLET2_R, FILLET2_R), FILLET2_R, 180, 90)
            Line((0, FILLET2_R), (0, 0))
            Line((0, 0), (FILLET2_R, 0))
        make_face()
    extrude(amount=2)
    with BuildSketch(Plane(origin=(42.459820624, -24.6, 0), x_dir=(1, 0, 0), z_dir=(0, 0, 1))) as fillet2_piece_2:
        with BuildLine():
            CenterArc((1.497527779, -2), FILLET2_R, 90, 66.421821522)
            ThreePointArc((-0.335502499, -1.2), (-0.126016346, -0.61166847), (0, 0))
            Line((0, 0), (1.497527779, 0))
        make_face()
    extrude(amount=2)
    with BuildSketch(Plane(origin=(53.85, -24.6, 3), x_dir=(0, -1, 0), z_dir=(0, 0, -1))) as fillet2_piece_3:
        with BuildLine():
            CenterArc((FILLET2_R, FILLET2_R), FILLET2_R, 180, 90)
            Line((0, FILLET2_R), (0, 0))
            Line((0, 0), (FILLET2_R, 0))
        make_face()
    extrude(amount=1)

    # Fillet3
    fillet3_edges = [part_1.edges().sort_by_distance(p)[0] for p in [
        (63.45, -15, 1.5),
    ]]
    fillet(fillet3_edges, radius=FILLET3_R)

    # Sketch21 → Boss-Extrude11 (add)
    with BuildSketch(Plane.XY.offset(3)):
        with BuildLine():
            ThreePointArc((42.65, -1.25), (41.678513356, 2.570994635), (39, 5.463977956))
            Line((39, 5.463977956), (39, -7.963977956))
            ThreePointArc((39, -7.963977956), (41.678513356, -5.070994635), (42.65, -1.25))
        make_face()
        with BuildLine():
            ThreePointArc((32, -2.656236111), (31.65, -1.25), (32, 0.156236111))
            Line((32, 0.156236111), (32, 6.298344189))
            ThreePointArc((32, 6.298344189), (26.65, -1.25), (32, -8.798344189))
            Line((32, -8.798344189), (32, -2.656236111))
        make_face()
        with BuildLine():
            ThreePointArc((32, -2.656236111), (35.374568837, -4.161185326), (37.65, -1.25))
            ThreePointArc((37.65, -1.25), (35.374568837, 1.661185326), (32, 0.156236111))
            Line((32, 0.156236111), (32, -2.656236111))
        make_face()
        with BuildLine():
            Line((32, -2.656236111), (32, 0.156236111))
            ThreePointArc((32, 0.156236111), (31.65, -1.25), (32, -2.656236111))
        make_face()
    extrude(amount=-BOSS_EXTRUDE11_DEPTH)

    # Sketch21<3> → Cut-Extrude8 (cut, through all)
    with BuildSketch(Plane.XY.offset(3)):
        with BuildLine():
            ThreePointArc((32, -2.656236111), (35.374568837, -4.161185326), (37.65, -1.25))
            ThreePointArc((37.65, -1.25), (35.374568837, 1.661185326), (32, 0.156236111))
            Line((32, 0.156236111), (32, -2.656236111))
        make_face()
        with BuildLine():
            Line((32, -2.656236111), (32, 0.156236111))
            ThreePointArc((32, 0.156236111), (31.65, -1.25), (32, -2.656236111))
        make_face()
    extrude(amount=-CUT_EXTRUDE8_DEPTH, mode=Mode.SUBTRACT)

    # Sketch22 → Boss-Extrude13 (add)
    with BuildSketch(Plane.XY.offset(3)):
        Polygon((42, 22.938447187), (42, 30.663257031), (38.94848837, 30.663257031), (40.750845264, 20.433528286), (42, 20.872691791), align=None)
    extrude(amount=-BOSS_EXTRUDE13_DEPTH)

    # Sketch23 → Cut-Extrude9 (cut)
    with BuildSketch(Plane.XY.offset(2).offset(CUT_EXTRUDE9_START)):
        with Locations((38, 25)):
            Circle(SKETCH23_R)
    extrude(amount=-CUT_EXTRUDE9_DEPTH, mode=Mode.SUBTRACT)

    # Sketch24 → Boss-Extrude14 (add)
    with BuildSketch(Plane.XY.offset(3)):
        with BuildLine():
            Line((42, 38.45), (51, 38.45))
            ThreePointArc((51, 38.45), (55.8, 43.25), (51, 48.05))
            Line((51, 48.05), (34, 48.05))
            Line((34, 48.05), (34, 30.663257031))
            Line((34, 30.663257031), (42, 30.663257031))
            Line((42, 30.663257031), (42, 38.45))
        make_face()
        with Locations((51, 43.25)):
            Circle(SKETCH24_R, mode=Mode.SUBTRACT)
    extrude(amount=-BOSS_EXTRUDE14_DEPTH)

    # Sketch25 → Cut-Extrude10 (cut, through all)
    with BuildSketch(Plane.XY.offset(3)):
        Polygon((39, 5.463977956), (39, -7.963977956), (43.892549403, -7.026039412), (43.892549403, 5.463977956), align=None)
    extrude(amount=-CUT_EXTRUDE10_DEPTH, mode=Mode.SUBTRACT)

    # Fillet4
    fillet4_edges = [part_1.edges().sort_by_distance(p)[0] for p in [
        (42, 38.45, 1.5),
    ]]
    fillet(fillet4_edges, radius=FILLET4_R)

    # Fillet5
    fillet5_edges = [part_1.edges().sort_by_distance(p)[0] for p in [
        (34, 48.05, 1.5),
    ]]
    fillet(fillet5_edges, radius=FILLET5_R)


with BuildPart() as body_2_1:
    add(body_2.part)

    # Cut-Extrude6: cut by cut_extrude6_tool
    add(cut_extrude6_tool.part, mode=Mode.SUBTRACT)

    # Sketch26 → Boss-Extrude15 (add)
    with BuildSketch(Plane.XY.offset(3)):
        with BuildLine():
            Line((-16, 48.05), (-56, 48.05))
            ThreePointArc((-56, 48.05), (-60.8, 43.25), (-56, 38.45))
            Line((-56, 38.45), (-24, 38.45))
            Line((-24, 38.45), (-24, 30.663257031))
            Line((-24, 30.663257031), (-16, 30.663257031))
            Line((-16, 30.663257031), (-16, 48.05))
        make_face()
        with Locations((-56, 43.25)):
            Circle(SKETCH26_R, mode=Mode.SUBTRACT)
    extrude(amount=-BOSS_EXTRUDE15_DEPTH)

    # Fillet6
    fillet6_edges = [body_2_1.edges().sort_by_distance(p)[0] for p in [
        (-24, 38.45, 1.5),
    ]]
    fillet(fillet6_edges, radius=FILLET6_R)

    # Fillet7
    fillet7_edges = [body_2_1.edges().sort_by_distance(p)[0] for p in [
        (-16, 48.05, 1.5),
    ]]
    fillet(fillet7_edges, radius=FILLET7_R)

    # Sketch27 → Boss-Extrude16 (add)
    with BuildSketch(Plane.XY.offset(3)):
        Polygon((-24, -28.289083475), (-24, -32.135615049), (-21.706055942, -32.135615049), align=None)
    extrude(amount=-BOSS_EXTRUDE16_DEPTH)

    # Sketch28 → Boss-Extrude17 (add)
    # profile 1 of 2: a face of its own
    with BuildSketch(Plane.XY.offset(3)):
        with BuildLine():
            ThreePointArc((-58.55, -31.25), (-59.95588745, -34.64411255), (-63.35, -36.05))
            Line((-63.35, -36.05), (-16, -36.05))
            Line((-16, -36.05), (-16, -32.135615049))
            Line((-16, -32.135615049), (-24, -32.135615049))
            Line((-24, -32.135615049), (-24, -26.45))
            Line((-24, -26.45), (-63.35, -26.45))
            ThreePointArc((-63.35, -26.45), (-59.95588745, -27.85588745), (-58.55, -31.25))
        make_face()
    # profile 2 of 2: a face of its own
    with BuildSketch(Plane.XY.offset(3)):
        with Locations((-63.35, -31.25)):
            Circle(SKETCH28_R)
        with Locations((-63.35, -31.25)):
            Circle(SKETCH28_R_2, mode=Mode.SUBTRACT)
    extrude(amount=-BOSS_EXTRUDE17_DEPTH)

    # Sketch30 → Cut-Extrude11 (cut)
    with BuildSketch(Plane.XY.offset(3)):
        with BuildLine():
            Line((-24, -31.05), (-24, -26.45))
            Line((-24, -26.45), (-63.35, -26.45))
            ThreePointArc((-63.35, -26.45), (-61.940336374, -26.661661688), (-60.654994325, -27.277979807))
            Line((-60.654994325, -27.277979807), (-55.095621849, -31.05))
            Line((-55.095621849, -31.05), (-24, -31.05))
        make_face()
    extrude(amount=-CUT_EXTRUDE11_DEPTH, mode=Mode.SUBTRACT)

    # Sketch30<3> → Boss-Extrude18 (add)
    with BuildSketch(Plane.XY.offset(3)):
        with BuildLine():
            ThreePointArc((-63.35, -36.05), (-64.759663626, -35.838338312), (-66.045005675, -35.222020193))
            Line((-66.045005675, -35.222020193), (-58.045005675, -40.65))
            Line((-58.045005675, -40.65), (-24, -40.65))
            Line((-24, -40.65), (-16, -36.05))
            Line((-16, -36.05), (-63.35, -36.05))
        make_face()
    extrude(amount=-BOSS_EXTRUDE18_DEPTH)

    # Fillet10
    fillet10_edges = [body_2_1.edges().sort_by_distance(p)[0] for p in [
        (-24, -31.05, 1.5),
    ]]
    fillet(fillet10_edges, radius=FILLET10_R)

    # Fillet11
    fillet11_edges = [body_2_1.edges().sort_by_distance(p)[0] for p in [
        (-16, -36.05, 1.5),
        (-55.095621849, -31.05, 1.5),
        (-58.045005675, -40.65, 1.5),
        (-24, -40.65, 1.5),
    ]]
    fillet(fillet11_edges, radius=FILLET11_R)


solid = Compound([part_1.part, body_2_1.part])
